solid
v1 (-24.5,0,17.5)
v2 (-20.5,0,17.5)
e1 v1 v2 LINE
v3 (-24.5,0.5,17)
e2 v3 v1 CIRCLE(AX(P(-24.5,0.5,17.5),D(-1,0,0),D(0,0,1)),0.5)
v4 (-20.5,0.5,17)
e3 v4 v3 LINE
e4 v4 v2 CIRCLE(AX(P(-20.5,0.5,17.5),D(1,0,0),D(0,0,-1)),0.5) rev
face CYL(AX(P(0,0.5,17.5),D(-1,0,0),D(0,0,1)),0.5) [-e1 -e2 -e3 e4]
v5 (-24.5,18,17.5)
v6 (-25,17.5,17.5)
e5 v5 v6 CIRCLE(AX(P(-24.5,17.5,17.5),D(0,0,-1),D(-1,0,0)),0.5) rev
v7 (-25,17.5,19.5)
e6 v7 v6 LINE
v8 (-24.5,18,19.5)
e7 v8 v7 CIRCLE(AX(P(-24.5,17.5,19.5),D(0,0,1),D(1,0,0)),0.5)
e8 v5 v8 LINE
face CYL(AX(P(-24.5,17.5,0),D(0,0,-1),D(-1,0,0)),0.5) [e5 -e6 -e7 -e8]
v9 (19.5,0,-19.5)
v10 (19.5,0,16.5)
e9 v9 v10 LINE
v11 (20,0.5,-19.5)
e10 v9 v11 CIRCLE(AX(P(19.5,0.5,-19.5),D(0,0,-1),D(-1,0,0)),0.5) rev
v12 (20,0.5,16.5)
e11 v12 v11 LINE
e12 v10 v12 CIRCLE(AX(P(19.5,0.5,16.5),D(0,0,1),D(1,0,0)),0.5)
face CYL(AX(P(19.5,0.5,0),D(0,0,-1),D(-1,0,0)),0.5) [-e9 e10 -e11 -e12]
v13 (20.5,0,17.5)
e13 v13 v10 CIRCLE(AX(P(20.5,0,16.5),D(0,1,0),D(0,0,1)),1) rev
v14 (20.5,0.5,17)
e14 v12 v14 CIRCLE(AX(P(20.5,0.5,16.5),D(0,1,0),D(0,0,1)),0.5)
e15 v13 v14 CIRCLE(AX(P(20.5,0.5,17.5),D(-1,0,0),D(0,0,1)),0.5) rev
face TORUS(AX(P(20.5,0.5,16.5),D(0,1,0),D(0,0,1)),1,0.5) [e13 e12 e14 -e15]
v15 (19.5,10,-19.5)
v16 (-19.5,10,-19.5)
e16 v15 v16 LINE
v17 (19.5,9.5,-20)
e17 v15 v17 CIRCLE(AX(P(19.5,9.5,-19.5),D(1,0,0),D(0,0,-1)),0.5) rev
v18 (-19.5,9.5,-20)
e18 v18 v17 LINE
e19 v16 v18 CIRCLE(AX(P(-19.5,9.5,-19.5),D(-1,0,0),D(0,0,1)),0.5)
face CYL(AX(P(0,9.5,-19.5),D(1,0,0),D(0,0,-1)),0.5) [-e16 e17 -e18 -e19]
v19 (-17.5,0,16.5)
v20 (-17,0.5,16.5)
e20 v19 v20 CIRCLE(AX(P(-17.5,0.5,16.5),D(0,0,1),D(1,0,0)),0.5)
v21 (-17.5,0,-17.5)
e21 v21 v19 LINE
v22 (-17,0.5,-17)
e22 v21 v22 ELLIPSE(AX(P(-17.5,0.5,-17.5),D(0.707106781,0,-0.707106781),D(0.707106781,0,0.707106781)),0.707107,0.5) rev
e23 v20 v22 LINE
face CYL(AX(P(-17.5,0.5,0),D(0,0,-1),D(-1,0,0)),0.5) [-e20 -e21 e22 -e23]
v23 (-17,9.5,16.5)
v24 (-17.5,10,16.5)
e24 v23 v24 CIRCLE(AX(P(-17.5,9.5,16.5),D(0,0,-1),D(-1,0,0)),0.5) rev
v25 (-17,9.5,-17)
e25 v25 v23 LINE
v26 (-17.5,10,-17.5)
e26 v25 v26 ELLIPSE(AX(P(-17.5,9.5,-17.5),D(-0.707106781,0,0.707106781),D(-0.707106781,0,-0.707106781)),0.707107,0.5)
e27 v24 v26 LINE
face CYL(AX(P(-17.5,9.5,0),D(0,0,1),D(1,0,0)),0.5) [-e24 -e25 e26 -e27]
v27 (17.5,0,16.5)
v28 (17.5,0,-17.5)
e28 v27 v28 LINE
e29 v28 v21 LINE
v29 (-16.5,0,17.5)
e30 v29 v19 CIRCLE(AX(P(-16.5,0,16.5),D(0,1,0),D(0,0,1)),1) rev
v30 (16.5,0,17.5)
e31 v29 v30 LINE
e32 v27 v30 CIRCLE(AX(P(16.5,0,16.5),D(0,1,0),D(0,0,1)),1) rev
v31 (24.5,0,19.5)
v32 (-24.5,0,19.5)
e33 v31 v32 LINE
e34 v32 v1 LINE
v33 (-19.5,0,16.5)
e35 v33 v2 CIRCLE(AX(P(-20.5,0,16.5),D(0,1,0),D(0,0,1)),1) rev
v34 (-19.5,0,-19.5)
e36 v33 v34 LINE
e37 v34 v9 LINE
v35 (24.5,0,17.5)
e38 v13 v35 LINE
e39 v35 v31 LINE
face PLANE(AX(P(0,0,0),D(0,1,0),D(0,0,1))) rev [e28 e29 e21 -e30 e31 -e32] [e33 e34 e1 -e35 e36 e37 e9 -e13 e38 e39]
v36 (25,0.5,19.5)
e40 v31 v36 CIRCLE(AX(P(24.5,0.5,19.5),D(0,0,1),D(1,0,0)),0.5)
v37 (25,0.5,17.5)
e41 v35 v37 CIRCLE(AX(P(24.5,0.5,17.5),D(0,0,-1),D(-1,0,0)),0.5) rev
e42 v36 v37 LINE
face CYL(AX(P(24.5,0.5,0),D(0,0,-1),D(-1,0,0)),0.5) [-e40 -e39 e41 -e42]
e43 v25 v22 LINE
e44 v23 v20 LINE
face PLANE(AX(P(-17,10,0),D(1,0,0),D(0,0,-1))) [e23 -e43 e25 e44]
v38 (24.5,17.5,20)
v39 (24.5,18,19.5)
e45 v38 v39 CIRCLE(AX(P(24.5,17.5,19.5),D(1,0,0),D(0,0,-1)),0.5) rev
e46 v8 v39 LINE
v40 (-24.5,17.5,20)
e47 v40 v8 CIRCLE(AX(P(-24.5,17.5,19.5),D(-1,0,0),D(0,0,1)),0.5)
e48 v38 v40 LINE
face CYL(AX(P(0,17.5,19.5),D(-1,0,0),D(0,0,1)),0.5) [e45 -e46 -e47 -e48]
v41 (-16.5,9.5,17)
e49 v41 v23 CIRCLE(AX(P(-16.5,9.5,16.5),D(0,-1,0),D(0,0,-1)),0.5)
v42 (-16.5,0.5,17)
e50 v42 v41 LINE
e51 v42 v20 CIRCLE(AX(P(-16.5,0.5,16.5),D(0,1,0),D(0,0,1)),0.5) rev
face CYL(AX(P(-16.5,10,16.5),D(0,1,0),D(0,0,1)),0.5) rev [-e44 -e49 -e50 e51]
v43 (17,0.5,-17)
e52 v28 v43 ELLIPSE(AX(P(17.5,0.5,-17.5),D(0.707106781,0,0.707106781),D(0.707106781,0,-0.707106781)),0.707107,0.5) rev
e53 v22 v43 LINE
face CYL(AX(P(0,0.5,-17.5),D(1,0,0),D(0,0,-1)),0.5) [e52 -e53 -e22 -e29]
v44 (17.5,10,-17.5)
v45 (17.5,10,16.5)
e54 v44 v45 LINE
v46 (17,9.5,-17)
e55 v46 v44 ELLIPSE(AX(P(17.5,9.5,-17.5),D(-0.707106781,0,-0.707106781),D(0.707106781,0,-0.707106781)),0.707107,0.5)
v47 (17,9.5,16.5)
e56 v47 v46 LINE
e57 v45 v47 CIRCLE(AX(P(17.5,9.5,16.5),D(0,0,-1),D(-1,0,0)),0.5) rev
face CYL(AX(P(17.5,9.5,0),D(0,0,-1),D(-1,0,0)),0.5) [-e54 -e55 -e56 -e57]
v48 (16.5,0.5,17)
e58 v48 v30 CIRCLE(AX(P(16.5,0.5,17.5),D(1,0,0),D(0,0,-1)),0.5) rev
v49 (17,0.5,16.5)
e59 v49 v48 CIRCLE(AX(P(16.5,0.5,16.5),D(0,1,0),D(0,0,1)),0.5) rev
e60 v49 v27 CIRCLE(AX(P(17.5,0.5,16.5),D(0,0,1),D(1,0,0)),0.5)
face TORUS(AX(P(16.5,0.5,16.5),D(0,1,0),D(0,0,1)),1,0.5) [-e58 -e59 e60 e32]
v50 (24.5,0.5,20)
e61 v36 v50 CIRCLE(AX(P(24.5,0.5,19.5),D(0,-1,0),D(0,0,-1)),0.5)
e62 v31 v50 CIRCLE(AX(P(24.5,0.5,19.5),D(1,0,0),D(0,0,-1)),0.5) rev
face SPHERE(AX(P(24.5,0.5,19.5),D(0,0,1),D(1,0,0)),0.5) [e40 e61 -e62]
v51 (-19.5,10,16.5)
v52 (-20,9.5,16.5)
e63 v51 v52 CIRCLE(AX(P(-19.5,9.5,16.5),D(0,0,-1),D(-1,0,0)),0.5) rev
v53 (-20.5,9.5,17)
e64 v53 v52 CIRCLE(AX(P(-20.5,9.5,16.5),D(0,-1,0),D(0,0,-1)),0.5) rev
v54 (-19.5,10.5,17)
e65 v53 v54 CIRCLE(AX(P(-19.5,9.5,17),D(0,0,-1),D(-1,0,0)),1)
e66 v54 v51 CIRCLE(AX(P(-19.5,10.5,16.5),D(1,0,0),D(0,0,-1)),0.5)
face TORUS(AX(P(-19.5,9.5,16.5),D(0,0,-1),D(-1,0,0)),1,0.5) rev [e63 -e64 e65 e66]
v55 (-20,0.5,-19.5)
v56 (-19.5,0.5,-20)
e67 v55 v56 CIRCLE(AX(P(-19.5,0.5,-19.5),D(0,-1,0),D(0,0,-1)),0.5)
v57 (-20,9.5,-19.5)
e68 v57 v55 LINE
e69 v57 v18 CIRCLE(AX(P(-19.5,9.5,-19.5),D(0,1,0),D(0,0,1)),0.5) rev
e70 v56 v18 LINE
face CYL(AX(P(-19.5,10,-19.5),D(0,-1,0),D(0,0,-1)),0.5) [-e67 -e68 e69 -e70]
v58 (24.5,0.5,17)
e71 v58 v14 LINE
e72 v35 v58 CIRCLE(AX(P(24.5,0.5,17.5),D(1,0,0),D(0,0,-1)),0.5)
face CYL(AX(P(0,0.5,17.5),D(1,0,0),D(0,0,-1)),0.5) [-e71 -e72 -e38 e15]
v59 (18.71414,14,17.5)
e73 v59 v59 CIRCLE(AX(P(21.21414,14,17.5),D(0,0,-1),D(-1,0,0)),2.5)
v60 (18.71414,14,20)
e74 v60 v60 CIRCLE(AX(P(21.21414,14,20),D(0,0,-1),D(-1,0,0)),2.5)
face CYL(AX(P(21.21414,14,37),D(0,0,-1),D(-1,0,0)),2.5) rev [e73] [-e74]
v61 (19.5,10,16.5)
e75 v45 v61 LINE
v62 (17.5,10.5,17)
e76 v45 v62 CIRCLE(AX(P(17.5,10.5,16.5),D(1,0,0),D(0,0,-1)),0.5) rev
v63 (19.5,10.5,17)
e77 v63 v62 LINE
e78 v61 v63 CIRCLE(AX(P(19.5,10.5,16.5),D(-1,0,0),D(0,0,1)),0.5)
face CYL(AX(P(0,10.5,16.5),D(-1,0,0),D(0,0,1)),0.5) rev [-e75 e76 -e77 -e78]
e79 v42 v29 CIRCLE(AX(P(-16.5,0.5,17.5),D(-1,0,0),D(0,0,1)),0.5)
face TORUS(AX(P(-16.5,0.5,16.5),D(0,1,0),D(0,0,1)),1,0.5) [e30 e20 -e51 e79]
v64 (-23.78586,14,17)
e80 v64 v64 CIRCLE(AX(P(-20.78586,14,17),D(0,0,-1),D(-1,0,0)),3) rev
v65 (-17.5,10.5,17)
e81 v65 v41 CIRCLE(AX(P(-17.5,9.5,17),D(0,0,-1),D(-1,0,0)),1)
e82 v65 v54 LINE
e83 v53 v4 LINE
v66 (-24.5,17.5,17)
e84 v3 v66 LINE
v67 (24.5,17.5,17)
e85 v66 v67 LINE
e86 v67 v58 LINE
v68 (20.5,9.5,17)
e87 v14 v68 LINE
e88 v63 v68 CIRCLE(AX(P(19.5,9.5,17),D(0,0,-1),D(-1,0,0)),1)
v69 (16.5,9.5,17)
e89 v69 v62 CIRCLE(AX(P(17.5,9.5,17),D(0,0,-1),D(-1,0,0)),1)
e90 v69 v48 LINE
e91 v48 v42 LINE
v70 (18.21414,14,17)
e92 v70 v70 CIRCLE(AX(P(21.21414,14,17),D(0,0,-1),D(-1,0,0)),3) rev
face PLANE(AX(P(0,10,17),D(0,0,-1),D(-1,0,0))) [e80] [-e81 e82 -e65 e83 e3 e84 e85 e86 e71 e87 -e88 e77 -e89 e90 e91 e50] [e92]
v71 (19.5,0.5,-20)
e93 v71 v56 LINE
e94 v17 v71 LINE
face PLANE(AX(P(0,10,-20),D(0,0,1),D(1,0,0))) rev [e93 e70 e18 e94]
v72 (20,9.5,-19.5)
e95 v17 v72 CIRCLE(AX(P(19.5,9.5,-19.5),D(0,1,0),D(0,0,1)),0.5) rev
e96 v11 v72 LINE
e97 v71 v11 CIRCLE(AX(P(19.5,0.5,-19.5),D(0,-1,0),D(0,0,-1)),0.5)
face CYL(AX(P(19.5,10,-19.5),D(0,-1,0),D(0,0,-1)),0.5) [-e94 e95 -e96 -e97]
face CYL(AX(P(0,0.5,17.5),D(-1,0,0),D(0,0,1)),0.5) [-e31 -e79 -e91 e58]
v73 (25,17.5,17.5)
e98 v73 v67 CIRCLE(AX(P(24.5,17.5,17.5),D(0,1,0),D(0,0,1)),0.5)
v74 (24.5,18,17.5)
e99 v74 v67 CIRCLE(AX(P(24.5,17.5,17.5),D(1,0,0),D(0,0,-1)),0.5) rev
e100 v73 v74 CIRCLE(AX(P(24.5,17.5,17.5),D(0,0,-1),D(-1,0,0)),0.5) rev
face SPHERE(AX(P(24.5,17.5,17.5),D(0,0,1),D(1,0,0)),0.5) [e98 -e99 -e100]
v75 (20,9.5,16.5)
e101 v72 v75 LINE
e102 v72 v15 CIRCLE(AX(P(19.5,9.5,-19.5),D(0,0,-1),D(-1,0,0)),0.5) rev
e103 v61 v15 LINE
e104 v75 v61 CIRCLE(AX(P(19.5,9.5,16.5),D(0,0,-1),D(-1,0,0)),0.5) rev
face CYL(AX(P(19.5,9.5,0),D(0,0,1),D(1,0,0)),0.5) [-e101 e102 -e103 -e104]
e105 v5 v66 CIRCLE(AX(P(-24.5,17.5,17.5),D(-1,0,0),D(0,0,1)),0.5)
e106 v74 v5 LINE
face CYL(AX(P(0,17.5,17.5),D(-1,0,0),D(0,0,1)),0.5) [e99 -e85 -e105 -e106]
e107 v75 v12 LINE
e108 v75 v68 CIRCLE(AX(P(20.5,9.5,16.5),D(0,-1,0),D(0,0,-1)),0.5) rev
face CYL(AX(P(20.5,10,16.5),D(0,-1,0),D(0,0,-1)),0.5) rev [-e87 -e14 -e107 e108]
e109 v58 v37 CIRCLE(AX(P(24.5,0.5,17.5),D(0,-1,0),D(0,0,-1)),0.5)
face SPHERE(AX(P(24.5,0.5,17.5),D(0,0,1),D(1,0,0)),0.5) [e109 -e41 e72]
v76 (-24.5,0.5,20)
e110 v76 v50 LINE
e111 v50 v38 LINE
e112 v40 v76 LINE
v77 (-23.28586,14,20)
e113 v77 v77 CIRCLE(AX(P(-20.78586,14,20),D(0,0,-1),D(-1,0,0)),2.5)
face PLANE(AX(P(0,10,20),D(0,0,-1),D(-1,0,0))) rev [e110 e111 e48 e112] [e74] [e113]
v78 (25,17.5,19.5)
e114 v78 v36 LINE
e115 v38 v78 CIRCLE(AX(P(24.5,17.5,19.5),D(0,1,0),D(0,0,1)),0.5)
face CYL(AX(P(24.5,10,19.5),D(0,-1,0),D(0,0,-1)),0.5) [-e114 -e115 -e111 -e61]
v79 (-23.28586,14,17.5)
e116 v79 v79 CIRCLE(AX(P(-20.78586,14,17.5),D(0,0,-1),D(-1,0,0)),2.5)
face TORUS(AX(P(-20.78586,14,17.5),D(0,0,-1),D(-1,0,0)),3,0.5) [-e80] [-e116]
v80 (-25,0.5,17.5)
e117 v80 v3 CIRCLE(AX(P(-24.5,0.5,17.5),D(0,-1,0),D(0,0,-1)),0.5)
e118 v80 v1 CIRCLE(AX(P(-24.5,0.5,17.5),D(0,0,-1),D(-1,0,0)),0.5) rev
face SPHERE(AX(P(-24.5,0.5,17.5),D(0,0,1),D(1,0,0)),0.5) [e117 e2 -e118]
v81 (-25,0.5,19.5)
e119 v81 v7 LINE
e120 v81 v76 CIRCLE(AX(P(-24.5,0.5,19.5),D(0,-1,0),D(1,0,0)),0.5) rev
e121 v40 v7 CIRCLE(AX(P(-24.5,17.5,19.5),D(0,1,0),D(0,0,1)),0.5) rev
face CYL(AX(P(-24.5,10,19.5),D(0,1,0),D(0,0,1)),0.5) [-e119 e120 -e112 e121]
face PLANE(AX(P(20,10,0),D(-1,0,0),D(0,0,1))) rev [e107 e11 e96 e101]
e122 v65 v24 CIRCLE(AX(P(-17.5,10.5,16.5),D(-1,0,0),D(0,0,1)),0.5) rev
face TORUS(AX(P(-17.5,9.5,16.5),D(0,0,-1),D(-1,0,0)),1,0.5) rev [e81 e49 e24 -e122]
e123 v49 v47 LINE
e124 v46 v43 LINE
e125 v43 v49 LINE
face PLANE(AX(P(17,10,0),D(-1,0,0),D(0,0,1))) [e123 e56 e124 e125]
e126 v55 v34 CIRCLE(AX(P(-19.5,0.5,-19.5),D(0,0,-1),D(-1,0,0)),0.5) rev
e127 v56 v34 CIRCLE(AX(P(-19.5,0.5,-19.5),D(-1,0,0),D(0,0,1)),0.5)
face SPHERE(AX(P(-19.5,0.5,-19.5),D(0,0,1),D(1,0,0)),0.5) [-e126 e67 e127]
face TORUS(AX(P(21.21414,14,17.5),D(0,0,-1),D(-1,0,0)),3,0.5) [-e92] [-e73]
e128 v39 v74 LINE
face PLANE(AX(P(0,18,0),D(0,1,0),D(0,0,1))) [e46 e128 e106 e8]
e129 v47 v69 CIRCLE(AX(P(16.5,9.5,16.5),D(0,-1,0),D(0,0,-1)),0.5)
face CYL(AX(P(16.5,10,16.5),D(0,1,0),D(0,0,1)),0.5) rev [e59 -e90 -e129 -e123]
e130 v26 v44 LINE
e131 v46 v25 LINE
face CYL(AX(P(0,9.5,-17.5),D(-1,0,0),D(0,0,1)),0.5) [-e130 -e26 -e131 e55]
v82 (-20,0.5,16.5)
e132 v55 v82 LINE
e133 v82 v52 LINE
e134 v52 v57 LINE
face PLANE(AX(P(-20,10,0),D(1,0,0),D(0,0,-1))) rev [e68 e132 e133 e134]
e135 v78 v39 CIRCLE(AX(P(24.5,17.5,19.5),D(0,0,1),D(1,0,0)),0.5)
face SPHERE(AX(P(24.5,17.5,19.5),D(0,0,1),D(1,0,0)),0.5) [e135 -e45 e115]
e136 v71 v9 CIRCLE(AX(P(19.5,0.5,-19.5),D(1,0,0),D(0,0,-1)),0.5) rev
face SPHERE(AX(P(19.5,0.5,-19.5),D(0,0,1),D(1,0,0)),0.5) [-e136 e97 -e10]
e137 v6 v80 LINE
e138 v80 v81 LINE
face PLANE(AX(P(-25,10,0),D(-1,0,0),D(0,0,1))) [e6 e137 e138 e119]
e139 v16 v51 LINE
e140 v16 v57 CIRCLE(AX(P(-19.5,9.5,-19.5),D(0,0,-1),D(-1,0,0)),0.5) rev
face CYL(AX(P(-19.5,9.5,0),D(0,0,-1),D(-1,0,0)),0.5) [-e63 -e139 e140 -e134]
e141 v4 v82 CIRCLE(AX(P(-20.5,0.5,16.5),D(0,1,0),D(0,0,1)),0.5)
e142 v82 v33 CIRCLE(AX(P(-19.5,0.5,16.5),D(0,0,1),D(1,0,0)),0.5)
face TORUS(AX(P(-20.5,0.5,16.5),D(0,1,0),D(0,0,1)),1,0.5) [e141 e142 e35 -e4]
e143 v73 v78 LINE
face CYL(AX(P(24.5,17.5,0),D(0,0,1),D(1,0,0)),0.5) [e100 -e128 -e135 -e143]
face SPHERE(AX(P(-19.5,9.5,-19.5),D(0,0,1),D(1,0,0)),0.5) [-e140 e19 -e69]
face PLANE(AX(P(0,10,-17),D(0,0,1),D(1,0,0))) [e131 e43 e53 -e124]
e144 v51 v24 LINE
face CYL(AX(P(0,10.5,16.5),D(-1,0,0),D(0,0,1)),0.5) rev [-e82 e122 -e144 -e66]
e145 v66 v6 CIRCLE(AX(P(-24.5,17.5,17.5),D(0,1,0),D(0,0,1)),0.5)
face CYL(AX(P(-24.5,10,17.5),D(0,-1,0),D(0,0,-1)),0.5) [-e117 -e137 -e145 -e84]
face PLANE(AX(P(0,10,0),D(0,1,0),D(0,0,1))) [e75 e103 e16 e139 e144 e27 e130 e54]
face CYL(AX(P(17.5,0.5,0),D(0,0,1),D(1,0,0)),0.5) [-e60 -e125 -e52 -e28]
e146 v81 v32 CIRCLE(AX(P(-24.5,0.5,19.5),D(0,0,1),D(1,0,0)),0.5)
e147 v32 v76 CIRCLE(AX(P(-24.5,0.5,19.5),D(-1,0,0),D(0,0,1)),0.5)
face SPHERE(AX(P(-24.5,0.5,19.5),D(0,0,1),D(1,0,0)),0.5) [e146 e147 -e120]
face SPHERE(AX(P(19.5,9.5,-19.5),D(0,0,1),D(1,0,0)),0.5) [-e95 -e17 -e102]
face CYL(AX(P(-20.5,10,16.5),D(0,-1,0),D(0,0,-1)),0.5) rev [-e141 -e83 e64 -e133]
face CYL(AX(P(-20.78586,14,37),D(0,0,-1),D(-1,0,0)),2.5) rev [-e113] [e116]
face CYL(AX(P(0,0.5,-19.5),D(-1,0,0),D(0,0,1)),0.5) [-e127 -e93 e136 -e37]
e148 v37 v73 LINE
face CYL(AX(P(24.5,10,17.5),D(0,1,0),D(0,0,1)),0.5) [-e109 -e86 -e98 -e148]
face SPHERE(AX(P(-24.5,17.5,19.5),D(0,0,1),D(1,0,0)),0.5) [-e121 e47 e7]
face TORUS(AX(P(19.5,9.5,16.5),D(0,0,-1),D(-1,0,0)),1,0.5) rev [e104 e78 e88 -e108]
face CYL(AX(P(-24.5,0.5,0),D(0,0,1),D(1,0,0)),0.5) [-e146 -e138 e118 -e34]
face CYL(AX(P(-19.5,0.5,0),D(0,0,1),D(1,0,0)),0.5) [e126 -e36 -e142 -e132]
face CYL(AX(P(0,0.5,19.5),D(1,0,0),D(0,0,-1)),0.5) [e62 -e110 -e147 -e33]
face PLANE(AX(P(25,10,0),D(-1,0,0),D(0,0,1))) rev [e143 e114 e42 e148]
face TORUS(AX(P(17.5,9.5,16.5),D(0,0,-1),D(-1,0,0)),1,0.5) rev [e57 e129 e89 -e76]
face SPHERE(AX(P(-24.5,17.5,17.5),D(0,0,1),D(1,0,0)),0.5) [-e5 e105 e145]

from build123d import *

# Parameters (mm, degrees)
SKETCH_2_W          = 34
SKETCH_2_H          = 34
EXTRUDE_1_DEPTH     = 10
SKETCH_2_3_W        = 50
SKETCH_2_3_H        = 3
EXTRUDE_2_DEPTH     = 18
SKETCH_4_R          = 2.5
CUT_EXTRUDE_1_DEPTH = 20
FILLET_1_R          = 0.5


with BuildPart() as part:
    # 草图2 → 凸台-拉伸1 (new body)
    with BuildSketch(Plane(origin=(0, 0, 0), x_dir=(1, 0, 0), z_dir=(0, 1, 0))):
        Polygon((25, -20), (25, -17), (20, -17), (20, 20), (-20, 20), (-20, -17), (-25, -17), (-25, -20), align=None)
        Rectangle(SKETCH_2_W, SKETCH_2_H, mode=Mode.SUBTRACT)
    extrude(amount=EXTRUDE_1_DEPTH)

    # 草图2<3> → 凸台-拉伸2 (add)
    with BuildSketch(Plane(origin=(0, 0, 0), x_dir=(1, 0, 0), z_dir=(0, 1, 0))):
        with Locations((0, -18.5)):
            Rectangle(SKETCH_2_3_W, SKETCH_2_3_H)
    extrude(amount=EXTRUDE_2_DEPTH)

    # 草图4 → 切除-拉伸1 (cut)
    with BuildSketch(Plane(origin=(0, 0, 17), x_dir=(-1, 0, 0), z_dir=(0, 0, -1))):
        with Locations((-21.214140071, 14)):
            Circle(SKETCH_4_R)
        with Locations((20.785859929, 14)):
            Circle(SKETCH_4_R)
    extrude(amount=-CUT_EXTRUDE_1_DEPTH, mode=Mode.SUBTRACT)

    # 圆角1
    fillet_1_edges = [part.edges().sort_by_distance(p)[0] for p in [
        (-25, 9, 20),
        (25, 9, 20),
        (0, 18, 20),
        (-25, 18, 18.5),
        (25, 18, 18.5),
        (-25, 0, 18.5),
        (0, 0, 20),
        (25, 0, 18.5),
        (20, 0, -1.5),
        (-20, 0, -1.5),
        (0, 0, -17),
        (17, 0, 0),
        (-17, 0, 0),
        (20, 10, -1.5),
        (17, 10, 0),
        (0, 10, -17),
        (-17, 10, 0),
        (-20, 10, -1.5),
        (20, 5, -20),
        (0, 10, -20),
        (-20, 5, -20),
        (0, 0, -20),
        (17, 5, 17),
        (18.5, 10, 17),
        (20, 5, 17),
        (22.5, 0, 17),
        (25, 9, 17),
        (0, 18, 17),
        (-25, 9, 17),
        (-22.5, 0, 17),
        (-20, 5, 17),
        (-18.5, 10, 17),
        (-17, 5, 17),
        (0, 0, 17),
        (-18.285859929, 14, 17),
        (23.714140071, 14, 17),
    ]]
    fillet(fillet_1_edges, radius=FILLET_1_R)


solid = part.part
